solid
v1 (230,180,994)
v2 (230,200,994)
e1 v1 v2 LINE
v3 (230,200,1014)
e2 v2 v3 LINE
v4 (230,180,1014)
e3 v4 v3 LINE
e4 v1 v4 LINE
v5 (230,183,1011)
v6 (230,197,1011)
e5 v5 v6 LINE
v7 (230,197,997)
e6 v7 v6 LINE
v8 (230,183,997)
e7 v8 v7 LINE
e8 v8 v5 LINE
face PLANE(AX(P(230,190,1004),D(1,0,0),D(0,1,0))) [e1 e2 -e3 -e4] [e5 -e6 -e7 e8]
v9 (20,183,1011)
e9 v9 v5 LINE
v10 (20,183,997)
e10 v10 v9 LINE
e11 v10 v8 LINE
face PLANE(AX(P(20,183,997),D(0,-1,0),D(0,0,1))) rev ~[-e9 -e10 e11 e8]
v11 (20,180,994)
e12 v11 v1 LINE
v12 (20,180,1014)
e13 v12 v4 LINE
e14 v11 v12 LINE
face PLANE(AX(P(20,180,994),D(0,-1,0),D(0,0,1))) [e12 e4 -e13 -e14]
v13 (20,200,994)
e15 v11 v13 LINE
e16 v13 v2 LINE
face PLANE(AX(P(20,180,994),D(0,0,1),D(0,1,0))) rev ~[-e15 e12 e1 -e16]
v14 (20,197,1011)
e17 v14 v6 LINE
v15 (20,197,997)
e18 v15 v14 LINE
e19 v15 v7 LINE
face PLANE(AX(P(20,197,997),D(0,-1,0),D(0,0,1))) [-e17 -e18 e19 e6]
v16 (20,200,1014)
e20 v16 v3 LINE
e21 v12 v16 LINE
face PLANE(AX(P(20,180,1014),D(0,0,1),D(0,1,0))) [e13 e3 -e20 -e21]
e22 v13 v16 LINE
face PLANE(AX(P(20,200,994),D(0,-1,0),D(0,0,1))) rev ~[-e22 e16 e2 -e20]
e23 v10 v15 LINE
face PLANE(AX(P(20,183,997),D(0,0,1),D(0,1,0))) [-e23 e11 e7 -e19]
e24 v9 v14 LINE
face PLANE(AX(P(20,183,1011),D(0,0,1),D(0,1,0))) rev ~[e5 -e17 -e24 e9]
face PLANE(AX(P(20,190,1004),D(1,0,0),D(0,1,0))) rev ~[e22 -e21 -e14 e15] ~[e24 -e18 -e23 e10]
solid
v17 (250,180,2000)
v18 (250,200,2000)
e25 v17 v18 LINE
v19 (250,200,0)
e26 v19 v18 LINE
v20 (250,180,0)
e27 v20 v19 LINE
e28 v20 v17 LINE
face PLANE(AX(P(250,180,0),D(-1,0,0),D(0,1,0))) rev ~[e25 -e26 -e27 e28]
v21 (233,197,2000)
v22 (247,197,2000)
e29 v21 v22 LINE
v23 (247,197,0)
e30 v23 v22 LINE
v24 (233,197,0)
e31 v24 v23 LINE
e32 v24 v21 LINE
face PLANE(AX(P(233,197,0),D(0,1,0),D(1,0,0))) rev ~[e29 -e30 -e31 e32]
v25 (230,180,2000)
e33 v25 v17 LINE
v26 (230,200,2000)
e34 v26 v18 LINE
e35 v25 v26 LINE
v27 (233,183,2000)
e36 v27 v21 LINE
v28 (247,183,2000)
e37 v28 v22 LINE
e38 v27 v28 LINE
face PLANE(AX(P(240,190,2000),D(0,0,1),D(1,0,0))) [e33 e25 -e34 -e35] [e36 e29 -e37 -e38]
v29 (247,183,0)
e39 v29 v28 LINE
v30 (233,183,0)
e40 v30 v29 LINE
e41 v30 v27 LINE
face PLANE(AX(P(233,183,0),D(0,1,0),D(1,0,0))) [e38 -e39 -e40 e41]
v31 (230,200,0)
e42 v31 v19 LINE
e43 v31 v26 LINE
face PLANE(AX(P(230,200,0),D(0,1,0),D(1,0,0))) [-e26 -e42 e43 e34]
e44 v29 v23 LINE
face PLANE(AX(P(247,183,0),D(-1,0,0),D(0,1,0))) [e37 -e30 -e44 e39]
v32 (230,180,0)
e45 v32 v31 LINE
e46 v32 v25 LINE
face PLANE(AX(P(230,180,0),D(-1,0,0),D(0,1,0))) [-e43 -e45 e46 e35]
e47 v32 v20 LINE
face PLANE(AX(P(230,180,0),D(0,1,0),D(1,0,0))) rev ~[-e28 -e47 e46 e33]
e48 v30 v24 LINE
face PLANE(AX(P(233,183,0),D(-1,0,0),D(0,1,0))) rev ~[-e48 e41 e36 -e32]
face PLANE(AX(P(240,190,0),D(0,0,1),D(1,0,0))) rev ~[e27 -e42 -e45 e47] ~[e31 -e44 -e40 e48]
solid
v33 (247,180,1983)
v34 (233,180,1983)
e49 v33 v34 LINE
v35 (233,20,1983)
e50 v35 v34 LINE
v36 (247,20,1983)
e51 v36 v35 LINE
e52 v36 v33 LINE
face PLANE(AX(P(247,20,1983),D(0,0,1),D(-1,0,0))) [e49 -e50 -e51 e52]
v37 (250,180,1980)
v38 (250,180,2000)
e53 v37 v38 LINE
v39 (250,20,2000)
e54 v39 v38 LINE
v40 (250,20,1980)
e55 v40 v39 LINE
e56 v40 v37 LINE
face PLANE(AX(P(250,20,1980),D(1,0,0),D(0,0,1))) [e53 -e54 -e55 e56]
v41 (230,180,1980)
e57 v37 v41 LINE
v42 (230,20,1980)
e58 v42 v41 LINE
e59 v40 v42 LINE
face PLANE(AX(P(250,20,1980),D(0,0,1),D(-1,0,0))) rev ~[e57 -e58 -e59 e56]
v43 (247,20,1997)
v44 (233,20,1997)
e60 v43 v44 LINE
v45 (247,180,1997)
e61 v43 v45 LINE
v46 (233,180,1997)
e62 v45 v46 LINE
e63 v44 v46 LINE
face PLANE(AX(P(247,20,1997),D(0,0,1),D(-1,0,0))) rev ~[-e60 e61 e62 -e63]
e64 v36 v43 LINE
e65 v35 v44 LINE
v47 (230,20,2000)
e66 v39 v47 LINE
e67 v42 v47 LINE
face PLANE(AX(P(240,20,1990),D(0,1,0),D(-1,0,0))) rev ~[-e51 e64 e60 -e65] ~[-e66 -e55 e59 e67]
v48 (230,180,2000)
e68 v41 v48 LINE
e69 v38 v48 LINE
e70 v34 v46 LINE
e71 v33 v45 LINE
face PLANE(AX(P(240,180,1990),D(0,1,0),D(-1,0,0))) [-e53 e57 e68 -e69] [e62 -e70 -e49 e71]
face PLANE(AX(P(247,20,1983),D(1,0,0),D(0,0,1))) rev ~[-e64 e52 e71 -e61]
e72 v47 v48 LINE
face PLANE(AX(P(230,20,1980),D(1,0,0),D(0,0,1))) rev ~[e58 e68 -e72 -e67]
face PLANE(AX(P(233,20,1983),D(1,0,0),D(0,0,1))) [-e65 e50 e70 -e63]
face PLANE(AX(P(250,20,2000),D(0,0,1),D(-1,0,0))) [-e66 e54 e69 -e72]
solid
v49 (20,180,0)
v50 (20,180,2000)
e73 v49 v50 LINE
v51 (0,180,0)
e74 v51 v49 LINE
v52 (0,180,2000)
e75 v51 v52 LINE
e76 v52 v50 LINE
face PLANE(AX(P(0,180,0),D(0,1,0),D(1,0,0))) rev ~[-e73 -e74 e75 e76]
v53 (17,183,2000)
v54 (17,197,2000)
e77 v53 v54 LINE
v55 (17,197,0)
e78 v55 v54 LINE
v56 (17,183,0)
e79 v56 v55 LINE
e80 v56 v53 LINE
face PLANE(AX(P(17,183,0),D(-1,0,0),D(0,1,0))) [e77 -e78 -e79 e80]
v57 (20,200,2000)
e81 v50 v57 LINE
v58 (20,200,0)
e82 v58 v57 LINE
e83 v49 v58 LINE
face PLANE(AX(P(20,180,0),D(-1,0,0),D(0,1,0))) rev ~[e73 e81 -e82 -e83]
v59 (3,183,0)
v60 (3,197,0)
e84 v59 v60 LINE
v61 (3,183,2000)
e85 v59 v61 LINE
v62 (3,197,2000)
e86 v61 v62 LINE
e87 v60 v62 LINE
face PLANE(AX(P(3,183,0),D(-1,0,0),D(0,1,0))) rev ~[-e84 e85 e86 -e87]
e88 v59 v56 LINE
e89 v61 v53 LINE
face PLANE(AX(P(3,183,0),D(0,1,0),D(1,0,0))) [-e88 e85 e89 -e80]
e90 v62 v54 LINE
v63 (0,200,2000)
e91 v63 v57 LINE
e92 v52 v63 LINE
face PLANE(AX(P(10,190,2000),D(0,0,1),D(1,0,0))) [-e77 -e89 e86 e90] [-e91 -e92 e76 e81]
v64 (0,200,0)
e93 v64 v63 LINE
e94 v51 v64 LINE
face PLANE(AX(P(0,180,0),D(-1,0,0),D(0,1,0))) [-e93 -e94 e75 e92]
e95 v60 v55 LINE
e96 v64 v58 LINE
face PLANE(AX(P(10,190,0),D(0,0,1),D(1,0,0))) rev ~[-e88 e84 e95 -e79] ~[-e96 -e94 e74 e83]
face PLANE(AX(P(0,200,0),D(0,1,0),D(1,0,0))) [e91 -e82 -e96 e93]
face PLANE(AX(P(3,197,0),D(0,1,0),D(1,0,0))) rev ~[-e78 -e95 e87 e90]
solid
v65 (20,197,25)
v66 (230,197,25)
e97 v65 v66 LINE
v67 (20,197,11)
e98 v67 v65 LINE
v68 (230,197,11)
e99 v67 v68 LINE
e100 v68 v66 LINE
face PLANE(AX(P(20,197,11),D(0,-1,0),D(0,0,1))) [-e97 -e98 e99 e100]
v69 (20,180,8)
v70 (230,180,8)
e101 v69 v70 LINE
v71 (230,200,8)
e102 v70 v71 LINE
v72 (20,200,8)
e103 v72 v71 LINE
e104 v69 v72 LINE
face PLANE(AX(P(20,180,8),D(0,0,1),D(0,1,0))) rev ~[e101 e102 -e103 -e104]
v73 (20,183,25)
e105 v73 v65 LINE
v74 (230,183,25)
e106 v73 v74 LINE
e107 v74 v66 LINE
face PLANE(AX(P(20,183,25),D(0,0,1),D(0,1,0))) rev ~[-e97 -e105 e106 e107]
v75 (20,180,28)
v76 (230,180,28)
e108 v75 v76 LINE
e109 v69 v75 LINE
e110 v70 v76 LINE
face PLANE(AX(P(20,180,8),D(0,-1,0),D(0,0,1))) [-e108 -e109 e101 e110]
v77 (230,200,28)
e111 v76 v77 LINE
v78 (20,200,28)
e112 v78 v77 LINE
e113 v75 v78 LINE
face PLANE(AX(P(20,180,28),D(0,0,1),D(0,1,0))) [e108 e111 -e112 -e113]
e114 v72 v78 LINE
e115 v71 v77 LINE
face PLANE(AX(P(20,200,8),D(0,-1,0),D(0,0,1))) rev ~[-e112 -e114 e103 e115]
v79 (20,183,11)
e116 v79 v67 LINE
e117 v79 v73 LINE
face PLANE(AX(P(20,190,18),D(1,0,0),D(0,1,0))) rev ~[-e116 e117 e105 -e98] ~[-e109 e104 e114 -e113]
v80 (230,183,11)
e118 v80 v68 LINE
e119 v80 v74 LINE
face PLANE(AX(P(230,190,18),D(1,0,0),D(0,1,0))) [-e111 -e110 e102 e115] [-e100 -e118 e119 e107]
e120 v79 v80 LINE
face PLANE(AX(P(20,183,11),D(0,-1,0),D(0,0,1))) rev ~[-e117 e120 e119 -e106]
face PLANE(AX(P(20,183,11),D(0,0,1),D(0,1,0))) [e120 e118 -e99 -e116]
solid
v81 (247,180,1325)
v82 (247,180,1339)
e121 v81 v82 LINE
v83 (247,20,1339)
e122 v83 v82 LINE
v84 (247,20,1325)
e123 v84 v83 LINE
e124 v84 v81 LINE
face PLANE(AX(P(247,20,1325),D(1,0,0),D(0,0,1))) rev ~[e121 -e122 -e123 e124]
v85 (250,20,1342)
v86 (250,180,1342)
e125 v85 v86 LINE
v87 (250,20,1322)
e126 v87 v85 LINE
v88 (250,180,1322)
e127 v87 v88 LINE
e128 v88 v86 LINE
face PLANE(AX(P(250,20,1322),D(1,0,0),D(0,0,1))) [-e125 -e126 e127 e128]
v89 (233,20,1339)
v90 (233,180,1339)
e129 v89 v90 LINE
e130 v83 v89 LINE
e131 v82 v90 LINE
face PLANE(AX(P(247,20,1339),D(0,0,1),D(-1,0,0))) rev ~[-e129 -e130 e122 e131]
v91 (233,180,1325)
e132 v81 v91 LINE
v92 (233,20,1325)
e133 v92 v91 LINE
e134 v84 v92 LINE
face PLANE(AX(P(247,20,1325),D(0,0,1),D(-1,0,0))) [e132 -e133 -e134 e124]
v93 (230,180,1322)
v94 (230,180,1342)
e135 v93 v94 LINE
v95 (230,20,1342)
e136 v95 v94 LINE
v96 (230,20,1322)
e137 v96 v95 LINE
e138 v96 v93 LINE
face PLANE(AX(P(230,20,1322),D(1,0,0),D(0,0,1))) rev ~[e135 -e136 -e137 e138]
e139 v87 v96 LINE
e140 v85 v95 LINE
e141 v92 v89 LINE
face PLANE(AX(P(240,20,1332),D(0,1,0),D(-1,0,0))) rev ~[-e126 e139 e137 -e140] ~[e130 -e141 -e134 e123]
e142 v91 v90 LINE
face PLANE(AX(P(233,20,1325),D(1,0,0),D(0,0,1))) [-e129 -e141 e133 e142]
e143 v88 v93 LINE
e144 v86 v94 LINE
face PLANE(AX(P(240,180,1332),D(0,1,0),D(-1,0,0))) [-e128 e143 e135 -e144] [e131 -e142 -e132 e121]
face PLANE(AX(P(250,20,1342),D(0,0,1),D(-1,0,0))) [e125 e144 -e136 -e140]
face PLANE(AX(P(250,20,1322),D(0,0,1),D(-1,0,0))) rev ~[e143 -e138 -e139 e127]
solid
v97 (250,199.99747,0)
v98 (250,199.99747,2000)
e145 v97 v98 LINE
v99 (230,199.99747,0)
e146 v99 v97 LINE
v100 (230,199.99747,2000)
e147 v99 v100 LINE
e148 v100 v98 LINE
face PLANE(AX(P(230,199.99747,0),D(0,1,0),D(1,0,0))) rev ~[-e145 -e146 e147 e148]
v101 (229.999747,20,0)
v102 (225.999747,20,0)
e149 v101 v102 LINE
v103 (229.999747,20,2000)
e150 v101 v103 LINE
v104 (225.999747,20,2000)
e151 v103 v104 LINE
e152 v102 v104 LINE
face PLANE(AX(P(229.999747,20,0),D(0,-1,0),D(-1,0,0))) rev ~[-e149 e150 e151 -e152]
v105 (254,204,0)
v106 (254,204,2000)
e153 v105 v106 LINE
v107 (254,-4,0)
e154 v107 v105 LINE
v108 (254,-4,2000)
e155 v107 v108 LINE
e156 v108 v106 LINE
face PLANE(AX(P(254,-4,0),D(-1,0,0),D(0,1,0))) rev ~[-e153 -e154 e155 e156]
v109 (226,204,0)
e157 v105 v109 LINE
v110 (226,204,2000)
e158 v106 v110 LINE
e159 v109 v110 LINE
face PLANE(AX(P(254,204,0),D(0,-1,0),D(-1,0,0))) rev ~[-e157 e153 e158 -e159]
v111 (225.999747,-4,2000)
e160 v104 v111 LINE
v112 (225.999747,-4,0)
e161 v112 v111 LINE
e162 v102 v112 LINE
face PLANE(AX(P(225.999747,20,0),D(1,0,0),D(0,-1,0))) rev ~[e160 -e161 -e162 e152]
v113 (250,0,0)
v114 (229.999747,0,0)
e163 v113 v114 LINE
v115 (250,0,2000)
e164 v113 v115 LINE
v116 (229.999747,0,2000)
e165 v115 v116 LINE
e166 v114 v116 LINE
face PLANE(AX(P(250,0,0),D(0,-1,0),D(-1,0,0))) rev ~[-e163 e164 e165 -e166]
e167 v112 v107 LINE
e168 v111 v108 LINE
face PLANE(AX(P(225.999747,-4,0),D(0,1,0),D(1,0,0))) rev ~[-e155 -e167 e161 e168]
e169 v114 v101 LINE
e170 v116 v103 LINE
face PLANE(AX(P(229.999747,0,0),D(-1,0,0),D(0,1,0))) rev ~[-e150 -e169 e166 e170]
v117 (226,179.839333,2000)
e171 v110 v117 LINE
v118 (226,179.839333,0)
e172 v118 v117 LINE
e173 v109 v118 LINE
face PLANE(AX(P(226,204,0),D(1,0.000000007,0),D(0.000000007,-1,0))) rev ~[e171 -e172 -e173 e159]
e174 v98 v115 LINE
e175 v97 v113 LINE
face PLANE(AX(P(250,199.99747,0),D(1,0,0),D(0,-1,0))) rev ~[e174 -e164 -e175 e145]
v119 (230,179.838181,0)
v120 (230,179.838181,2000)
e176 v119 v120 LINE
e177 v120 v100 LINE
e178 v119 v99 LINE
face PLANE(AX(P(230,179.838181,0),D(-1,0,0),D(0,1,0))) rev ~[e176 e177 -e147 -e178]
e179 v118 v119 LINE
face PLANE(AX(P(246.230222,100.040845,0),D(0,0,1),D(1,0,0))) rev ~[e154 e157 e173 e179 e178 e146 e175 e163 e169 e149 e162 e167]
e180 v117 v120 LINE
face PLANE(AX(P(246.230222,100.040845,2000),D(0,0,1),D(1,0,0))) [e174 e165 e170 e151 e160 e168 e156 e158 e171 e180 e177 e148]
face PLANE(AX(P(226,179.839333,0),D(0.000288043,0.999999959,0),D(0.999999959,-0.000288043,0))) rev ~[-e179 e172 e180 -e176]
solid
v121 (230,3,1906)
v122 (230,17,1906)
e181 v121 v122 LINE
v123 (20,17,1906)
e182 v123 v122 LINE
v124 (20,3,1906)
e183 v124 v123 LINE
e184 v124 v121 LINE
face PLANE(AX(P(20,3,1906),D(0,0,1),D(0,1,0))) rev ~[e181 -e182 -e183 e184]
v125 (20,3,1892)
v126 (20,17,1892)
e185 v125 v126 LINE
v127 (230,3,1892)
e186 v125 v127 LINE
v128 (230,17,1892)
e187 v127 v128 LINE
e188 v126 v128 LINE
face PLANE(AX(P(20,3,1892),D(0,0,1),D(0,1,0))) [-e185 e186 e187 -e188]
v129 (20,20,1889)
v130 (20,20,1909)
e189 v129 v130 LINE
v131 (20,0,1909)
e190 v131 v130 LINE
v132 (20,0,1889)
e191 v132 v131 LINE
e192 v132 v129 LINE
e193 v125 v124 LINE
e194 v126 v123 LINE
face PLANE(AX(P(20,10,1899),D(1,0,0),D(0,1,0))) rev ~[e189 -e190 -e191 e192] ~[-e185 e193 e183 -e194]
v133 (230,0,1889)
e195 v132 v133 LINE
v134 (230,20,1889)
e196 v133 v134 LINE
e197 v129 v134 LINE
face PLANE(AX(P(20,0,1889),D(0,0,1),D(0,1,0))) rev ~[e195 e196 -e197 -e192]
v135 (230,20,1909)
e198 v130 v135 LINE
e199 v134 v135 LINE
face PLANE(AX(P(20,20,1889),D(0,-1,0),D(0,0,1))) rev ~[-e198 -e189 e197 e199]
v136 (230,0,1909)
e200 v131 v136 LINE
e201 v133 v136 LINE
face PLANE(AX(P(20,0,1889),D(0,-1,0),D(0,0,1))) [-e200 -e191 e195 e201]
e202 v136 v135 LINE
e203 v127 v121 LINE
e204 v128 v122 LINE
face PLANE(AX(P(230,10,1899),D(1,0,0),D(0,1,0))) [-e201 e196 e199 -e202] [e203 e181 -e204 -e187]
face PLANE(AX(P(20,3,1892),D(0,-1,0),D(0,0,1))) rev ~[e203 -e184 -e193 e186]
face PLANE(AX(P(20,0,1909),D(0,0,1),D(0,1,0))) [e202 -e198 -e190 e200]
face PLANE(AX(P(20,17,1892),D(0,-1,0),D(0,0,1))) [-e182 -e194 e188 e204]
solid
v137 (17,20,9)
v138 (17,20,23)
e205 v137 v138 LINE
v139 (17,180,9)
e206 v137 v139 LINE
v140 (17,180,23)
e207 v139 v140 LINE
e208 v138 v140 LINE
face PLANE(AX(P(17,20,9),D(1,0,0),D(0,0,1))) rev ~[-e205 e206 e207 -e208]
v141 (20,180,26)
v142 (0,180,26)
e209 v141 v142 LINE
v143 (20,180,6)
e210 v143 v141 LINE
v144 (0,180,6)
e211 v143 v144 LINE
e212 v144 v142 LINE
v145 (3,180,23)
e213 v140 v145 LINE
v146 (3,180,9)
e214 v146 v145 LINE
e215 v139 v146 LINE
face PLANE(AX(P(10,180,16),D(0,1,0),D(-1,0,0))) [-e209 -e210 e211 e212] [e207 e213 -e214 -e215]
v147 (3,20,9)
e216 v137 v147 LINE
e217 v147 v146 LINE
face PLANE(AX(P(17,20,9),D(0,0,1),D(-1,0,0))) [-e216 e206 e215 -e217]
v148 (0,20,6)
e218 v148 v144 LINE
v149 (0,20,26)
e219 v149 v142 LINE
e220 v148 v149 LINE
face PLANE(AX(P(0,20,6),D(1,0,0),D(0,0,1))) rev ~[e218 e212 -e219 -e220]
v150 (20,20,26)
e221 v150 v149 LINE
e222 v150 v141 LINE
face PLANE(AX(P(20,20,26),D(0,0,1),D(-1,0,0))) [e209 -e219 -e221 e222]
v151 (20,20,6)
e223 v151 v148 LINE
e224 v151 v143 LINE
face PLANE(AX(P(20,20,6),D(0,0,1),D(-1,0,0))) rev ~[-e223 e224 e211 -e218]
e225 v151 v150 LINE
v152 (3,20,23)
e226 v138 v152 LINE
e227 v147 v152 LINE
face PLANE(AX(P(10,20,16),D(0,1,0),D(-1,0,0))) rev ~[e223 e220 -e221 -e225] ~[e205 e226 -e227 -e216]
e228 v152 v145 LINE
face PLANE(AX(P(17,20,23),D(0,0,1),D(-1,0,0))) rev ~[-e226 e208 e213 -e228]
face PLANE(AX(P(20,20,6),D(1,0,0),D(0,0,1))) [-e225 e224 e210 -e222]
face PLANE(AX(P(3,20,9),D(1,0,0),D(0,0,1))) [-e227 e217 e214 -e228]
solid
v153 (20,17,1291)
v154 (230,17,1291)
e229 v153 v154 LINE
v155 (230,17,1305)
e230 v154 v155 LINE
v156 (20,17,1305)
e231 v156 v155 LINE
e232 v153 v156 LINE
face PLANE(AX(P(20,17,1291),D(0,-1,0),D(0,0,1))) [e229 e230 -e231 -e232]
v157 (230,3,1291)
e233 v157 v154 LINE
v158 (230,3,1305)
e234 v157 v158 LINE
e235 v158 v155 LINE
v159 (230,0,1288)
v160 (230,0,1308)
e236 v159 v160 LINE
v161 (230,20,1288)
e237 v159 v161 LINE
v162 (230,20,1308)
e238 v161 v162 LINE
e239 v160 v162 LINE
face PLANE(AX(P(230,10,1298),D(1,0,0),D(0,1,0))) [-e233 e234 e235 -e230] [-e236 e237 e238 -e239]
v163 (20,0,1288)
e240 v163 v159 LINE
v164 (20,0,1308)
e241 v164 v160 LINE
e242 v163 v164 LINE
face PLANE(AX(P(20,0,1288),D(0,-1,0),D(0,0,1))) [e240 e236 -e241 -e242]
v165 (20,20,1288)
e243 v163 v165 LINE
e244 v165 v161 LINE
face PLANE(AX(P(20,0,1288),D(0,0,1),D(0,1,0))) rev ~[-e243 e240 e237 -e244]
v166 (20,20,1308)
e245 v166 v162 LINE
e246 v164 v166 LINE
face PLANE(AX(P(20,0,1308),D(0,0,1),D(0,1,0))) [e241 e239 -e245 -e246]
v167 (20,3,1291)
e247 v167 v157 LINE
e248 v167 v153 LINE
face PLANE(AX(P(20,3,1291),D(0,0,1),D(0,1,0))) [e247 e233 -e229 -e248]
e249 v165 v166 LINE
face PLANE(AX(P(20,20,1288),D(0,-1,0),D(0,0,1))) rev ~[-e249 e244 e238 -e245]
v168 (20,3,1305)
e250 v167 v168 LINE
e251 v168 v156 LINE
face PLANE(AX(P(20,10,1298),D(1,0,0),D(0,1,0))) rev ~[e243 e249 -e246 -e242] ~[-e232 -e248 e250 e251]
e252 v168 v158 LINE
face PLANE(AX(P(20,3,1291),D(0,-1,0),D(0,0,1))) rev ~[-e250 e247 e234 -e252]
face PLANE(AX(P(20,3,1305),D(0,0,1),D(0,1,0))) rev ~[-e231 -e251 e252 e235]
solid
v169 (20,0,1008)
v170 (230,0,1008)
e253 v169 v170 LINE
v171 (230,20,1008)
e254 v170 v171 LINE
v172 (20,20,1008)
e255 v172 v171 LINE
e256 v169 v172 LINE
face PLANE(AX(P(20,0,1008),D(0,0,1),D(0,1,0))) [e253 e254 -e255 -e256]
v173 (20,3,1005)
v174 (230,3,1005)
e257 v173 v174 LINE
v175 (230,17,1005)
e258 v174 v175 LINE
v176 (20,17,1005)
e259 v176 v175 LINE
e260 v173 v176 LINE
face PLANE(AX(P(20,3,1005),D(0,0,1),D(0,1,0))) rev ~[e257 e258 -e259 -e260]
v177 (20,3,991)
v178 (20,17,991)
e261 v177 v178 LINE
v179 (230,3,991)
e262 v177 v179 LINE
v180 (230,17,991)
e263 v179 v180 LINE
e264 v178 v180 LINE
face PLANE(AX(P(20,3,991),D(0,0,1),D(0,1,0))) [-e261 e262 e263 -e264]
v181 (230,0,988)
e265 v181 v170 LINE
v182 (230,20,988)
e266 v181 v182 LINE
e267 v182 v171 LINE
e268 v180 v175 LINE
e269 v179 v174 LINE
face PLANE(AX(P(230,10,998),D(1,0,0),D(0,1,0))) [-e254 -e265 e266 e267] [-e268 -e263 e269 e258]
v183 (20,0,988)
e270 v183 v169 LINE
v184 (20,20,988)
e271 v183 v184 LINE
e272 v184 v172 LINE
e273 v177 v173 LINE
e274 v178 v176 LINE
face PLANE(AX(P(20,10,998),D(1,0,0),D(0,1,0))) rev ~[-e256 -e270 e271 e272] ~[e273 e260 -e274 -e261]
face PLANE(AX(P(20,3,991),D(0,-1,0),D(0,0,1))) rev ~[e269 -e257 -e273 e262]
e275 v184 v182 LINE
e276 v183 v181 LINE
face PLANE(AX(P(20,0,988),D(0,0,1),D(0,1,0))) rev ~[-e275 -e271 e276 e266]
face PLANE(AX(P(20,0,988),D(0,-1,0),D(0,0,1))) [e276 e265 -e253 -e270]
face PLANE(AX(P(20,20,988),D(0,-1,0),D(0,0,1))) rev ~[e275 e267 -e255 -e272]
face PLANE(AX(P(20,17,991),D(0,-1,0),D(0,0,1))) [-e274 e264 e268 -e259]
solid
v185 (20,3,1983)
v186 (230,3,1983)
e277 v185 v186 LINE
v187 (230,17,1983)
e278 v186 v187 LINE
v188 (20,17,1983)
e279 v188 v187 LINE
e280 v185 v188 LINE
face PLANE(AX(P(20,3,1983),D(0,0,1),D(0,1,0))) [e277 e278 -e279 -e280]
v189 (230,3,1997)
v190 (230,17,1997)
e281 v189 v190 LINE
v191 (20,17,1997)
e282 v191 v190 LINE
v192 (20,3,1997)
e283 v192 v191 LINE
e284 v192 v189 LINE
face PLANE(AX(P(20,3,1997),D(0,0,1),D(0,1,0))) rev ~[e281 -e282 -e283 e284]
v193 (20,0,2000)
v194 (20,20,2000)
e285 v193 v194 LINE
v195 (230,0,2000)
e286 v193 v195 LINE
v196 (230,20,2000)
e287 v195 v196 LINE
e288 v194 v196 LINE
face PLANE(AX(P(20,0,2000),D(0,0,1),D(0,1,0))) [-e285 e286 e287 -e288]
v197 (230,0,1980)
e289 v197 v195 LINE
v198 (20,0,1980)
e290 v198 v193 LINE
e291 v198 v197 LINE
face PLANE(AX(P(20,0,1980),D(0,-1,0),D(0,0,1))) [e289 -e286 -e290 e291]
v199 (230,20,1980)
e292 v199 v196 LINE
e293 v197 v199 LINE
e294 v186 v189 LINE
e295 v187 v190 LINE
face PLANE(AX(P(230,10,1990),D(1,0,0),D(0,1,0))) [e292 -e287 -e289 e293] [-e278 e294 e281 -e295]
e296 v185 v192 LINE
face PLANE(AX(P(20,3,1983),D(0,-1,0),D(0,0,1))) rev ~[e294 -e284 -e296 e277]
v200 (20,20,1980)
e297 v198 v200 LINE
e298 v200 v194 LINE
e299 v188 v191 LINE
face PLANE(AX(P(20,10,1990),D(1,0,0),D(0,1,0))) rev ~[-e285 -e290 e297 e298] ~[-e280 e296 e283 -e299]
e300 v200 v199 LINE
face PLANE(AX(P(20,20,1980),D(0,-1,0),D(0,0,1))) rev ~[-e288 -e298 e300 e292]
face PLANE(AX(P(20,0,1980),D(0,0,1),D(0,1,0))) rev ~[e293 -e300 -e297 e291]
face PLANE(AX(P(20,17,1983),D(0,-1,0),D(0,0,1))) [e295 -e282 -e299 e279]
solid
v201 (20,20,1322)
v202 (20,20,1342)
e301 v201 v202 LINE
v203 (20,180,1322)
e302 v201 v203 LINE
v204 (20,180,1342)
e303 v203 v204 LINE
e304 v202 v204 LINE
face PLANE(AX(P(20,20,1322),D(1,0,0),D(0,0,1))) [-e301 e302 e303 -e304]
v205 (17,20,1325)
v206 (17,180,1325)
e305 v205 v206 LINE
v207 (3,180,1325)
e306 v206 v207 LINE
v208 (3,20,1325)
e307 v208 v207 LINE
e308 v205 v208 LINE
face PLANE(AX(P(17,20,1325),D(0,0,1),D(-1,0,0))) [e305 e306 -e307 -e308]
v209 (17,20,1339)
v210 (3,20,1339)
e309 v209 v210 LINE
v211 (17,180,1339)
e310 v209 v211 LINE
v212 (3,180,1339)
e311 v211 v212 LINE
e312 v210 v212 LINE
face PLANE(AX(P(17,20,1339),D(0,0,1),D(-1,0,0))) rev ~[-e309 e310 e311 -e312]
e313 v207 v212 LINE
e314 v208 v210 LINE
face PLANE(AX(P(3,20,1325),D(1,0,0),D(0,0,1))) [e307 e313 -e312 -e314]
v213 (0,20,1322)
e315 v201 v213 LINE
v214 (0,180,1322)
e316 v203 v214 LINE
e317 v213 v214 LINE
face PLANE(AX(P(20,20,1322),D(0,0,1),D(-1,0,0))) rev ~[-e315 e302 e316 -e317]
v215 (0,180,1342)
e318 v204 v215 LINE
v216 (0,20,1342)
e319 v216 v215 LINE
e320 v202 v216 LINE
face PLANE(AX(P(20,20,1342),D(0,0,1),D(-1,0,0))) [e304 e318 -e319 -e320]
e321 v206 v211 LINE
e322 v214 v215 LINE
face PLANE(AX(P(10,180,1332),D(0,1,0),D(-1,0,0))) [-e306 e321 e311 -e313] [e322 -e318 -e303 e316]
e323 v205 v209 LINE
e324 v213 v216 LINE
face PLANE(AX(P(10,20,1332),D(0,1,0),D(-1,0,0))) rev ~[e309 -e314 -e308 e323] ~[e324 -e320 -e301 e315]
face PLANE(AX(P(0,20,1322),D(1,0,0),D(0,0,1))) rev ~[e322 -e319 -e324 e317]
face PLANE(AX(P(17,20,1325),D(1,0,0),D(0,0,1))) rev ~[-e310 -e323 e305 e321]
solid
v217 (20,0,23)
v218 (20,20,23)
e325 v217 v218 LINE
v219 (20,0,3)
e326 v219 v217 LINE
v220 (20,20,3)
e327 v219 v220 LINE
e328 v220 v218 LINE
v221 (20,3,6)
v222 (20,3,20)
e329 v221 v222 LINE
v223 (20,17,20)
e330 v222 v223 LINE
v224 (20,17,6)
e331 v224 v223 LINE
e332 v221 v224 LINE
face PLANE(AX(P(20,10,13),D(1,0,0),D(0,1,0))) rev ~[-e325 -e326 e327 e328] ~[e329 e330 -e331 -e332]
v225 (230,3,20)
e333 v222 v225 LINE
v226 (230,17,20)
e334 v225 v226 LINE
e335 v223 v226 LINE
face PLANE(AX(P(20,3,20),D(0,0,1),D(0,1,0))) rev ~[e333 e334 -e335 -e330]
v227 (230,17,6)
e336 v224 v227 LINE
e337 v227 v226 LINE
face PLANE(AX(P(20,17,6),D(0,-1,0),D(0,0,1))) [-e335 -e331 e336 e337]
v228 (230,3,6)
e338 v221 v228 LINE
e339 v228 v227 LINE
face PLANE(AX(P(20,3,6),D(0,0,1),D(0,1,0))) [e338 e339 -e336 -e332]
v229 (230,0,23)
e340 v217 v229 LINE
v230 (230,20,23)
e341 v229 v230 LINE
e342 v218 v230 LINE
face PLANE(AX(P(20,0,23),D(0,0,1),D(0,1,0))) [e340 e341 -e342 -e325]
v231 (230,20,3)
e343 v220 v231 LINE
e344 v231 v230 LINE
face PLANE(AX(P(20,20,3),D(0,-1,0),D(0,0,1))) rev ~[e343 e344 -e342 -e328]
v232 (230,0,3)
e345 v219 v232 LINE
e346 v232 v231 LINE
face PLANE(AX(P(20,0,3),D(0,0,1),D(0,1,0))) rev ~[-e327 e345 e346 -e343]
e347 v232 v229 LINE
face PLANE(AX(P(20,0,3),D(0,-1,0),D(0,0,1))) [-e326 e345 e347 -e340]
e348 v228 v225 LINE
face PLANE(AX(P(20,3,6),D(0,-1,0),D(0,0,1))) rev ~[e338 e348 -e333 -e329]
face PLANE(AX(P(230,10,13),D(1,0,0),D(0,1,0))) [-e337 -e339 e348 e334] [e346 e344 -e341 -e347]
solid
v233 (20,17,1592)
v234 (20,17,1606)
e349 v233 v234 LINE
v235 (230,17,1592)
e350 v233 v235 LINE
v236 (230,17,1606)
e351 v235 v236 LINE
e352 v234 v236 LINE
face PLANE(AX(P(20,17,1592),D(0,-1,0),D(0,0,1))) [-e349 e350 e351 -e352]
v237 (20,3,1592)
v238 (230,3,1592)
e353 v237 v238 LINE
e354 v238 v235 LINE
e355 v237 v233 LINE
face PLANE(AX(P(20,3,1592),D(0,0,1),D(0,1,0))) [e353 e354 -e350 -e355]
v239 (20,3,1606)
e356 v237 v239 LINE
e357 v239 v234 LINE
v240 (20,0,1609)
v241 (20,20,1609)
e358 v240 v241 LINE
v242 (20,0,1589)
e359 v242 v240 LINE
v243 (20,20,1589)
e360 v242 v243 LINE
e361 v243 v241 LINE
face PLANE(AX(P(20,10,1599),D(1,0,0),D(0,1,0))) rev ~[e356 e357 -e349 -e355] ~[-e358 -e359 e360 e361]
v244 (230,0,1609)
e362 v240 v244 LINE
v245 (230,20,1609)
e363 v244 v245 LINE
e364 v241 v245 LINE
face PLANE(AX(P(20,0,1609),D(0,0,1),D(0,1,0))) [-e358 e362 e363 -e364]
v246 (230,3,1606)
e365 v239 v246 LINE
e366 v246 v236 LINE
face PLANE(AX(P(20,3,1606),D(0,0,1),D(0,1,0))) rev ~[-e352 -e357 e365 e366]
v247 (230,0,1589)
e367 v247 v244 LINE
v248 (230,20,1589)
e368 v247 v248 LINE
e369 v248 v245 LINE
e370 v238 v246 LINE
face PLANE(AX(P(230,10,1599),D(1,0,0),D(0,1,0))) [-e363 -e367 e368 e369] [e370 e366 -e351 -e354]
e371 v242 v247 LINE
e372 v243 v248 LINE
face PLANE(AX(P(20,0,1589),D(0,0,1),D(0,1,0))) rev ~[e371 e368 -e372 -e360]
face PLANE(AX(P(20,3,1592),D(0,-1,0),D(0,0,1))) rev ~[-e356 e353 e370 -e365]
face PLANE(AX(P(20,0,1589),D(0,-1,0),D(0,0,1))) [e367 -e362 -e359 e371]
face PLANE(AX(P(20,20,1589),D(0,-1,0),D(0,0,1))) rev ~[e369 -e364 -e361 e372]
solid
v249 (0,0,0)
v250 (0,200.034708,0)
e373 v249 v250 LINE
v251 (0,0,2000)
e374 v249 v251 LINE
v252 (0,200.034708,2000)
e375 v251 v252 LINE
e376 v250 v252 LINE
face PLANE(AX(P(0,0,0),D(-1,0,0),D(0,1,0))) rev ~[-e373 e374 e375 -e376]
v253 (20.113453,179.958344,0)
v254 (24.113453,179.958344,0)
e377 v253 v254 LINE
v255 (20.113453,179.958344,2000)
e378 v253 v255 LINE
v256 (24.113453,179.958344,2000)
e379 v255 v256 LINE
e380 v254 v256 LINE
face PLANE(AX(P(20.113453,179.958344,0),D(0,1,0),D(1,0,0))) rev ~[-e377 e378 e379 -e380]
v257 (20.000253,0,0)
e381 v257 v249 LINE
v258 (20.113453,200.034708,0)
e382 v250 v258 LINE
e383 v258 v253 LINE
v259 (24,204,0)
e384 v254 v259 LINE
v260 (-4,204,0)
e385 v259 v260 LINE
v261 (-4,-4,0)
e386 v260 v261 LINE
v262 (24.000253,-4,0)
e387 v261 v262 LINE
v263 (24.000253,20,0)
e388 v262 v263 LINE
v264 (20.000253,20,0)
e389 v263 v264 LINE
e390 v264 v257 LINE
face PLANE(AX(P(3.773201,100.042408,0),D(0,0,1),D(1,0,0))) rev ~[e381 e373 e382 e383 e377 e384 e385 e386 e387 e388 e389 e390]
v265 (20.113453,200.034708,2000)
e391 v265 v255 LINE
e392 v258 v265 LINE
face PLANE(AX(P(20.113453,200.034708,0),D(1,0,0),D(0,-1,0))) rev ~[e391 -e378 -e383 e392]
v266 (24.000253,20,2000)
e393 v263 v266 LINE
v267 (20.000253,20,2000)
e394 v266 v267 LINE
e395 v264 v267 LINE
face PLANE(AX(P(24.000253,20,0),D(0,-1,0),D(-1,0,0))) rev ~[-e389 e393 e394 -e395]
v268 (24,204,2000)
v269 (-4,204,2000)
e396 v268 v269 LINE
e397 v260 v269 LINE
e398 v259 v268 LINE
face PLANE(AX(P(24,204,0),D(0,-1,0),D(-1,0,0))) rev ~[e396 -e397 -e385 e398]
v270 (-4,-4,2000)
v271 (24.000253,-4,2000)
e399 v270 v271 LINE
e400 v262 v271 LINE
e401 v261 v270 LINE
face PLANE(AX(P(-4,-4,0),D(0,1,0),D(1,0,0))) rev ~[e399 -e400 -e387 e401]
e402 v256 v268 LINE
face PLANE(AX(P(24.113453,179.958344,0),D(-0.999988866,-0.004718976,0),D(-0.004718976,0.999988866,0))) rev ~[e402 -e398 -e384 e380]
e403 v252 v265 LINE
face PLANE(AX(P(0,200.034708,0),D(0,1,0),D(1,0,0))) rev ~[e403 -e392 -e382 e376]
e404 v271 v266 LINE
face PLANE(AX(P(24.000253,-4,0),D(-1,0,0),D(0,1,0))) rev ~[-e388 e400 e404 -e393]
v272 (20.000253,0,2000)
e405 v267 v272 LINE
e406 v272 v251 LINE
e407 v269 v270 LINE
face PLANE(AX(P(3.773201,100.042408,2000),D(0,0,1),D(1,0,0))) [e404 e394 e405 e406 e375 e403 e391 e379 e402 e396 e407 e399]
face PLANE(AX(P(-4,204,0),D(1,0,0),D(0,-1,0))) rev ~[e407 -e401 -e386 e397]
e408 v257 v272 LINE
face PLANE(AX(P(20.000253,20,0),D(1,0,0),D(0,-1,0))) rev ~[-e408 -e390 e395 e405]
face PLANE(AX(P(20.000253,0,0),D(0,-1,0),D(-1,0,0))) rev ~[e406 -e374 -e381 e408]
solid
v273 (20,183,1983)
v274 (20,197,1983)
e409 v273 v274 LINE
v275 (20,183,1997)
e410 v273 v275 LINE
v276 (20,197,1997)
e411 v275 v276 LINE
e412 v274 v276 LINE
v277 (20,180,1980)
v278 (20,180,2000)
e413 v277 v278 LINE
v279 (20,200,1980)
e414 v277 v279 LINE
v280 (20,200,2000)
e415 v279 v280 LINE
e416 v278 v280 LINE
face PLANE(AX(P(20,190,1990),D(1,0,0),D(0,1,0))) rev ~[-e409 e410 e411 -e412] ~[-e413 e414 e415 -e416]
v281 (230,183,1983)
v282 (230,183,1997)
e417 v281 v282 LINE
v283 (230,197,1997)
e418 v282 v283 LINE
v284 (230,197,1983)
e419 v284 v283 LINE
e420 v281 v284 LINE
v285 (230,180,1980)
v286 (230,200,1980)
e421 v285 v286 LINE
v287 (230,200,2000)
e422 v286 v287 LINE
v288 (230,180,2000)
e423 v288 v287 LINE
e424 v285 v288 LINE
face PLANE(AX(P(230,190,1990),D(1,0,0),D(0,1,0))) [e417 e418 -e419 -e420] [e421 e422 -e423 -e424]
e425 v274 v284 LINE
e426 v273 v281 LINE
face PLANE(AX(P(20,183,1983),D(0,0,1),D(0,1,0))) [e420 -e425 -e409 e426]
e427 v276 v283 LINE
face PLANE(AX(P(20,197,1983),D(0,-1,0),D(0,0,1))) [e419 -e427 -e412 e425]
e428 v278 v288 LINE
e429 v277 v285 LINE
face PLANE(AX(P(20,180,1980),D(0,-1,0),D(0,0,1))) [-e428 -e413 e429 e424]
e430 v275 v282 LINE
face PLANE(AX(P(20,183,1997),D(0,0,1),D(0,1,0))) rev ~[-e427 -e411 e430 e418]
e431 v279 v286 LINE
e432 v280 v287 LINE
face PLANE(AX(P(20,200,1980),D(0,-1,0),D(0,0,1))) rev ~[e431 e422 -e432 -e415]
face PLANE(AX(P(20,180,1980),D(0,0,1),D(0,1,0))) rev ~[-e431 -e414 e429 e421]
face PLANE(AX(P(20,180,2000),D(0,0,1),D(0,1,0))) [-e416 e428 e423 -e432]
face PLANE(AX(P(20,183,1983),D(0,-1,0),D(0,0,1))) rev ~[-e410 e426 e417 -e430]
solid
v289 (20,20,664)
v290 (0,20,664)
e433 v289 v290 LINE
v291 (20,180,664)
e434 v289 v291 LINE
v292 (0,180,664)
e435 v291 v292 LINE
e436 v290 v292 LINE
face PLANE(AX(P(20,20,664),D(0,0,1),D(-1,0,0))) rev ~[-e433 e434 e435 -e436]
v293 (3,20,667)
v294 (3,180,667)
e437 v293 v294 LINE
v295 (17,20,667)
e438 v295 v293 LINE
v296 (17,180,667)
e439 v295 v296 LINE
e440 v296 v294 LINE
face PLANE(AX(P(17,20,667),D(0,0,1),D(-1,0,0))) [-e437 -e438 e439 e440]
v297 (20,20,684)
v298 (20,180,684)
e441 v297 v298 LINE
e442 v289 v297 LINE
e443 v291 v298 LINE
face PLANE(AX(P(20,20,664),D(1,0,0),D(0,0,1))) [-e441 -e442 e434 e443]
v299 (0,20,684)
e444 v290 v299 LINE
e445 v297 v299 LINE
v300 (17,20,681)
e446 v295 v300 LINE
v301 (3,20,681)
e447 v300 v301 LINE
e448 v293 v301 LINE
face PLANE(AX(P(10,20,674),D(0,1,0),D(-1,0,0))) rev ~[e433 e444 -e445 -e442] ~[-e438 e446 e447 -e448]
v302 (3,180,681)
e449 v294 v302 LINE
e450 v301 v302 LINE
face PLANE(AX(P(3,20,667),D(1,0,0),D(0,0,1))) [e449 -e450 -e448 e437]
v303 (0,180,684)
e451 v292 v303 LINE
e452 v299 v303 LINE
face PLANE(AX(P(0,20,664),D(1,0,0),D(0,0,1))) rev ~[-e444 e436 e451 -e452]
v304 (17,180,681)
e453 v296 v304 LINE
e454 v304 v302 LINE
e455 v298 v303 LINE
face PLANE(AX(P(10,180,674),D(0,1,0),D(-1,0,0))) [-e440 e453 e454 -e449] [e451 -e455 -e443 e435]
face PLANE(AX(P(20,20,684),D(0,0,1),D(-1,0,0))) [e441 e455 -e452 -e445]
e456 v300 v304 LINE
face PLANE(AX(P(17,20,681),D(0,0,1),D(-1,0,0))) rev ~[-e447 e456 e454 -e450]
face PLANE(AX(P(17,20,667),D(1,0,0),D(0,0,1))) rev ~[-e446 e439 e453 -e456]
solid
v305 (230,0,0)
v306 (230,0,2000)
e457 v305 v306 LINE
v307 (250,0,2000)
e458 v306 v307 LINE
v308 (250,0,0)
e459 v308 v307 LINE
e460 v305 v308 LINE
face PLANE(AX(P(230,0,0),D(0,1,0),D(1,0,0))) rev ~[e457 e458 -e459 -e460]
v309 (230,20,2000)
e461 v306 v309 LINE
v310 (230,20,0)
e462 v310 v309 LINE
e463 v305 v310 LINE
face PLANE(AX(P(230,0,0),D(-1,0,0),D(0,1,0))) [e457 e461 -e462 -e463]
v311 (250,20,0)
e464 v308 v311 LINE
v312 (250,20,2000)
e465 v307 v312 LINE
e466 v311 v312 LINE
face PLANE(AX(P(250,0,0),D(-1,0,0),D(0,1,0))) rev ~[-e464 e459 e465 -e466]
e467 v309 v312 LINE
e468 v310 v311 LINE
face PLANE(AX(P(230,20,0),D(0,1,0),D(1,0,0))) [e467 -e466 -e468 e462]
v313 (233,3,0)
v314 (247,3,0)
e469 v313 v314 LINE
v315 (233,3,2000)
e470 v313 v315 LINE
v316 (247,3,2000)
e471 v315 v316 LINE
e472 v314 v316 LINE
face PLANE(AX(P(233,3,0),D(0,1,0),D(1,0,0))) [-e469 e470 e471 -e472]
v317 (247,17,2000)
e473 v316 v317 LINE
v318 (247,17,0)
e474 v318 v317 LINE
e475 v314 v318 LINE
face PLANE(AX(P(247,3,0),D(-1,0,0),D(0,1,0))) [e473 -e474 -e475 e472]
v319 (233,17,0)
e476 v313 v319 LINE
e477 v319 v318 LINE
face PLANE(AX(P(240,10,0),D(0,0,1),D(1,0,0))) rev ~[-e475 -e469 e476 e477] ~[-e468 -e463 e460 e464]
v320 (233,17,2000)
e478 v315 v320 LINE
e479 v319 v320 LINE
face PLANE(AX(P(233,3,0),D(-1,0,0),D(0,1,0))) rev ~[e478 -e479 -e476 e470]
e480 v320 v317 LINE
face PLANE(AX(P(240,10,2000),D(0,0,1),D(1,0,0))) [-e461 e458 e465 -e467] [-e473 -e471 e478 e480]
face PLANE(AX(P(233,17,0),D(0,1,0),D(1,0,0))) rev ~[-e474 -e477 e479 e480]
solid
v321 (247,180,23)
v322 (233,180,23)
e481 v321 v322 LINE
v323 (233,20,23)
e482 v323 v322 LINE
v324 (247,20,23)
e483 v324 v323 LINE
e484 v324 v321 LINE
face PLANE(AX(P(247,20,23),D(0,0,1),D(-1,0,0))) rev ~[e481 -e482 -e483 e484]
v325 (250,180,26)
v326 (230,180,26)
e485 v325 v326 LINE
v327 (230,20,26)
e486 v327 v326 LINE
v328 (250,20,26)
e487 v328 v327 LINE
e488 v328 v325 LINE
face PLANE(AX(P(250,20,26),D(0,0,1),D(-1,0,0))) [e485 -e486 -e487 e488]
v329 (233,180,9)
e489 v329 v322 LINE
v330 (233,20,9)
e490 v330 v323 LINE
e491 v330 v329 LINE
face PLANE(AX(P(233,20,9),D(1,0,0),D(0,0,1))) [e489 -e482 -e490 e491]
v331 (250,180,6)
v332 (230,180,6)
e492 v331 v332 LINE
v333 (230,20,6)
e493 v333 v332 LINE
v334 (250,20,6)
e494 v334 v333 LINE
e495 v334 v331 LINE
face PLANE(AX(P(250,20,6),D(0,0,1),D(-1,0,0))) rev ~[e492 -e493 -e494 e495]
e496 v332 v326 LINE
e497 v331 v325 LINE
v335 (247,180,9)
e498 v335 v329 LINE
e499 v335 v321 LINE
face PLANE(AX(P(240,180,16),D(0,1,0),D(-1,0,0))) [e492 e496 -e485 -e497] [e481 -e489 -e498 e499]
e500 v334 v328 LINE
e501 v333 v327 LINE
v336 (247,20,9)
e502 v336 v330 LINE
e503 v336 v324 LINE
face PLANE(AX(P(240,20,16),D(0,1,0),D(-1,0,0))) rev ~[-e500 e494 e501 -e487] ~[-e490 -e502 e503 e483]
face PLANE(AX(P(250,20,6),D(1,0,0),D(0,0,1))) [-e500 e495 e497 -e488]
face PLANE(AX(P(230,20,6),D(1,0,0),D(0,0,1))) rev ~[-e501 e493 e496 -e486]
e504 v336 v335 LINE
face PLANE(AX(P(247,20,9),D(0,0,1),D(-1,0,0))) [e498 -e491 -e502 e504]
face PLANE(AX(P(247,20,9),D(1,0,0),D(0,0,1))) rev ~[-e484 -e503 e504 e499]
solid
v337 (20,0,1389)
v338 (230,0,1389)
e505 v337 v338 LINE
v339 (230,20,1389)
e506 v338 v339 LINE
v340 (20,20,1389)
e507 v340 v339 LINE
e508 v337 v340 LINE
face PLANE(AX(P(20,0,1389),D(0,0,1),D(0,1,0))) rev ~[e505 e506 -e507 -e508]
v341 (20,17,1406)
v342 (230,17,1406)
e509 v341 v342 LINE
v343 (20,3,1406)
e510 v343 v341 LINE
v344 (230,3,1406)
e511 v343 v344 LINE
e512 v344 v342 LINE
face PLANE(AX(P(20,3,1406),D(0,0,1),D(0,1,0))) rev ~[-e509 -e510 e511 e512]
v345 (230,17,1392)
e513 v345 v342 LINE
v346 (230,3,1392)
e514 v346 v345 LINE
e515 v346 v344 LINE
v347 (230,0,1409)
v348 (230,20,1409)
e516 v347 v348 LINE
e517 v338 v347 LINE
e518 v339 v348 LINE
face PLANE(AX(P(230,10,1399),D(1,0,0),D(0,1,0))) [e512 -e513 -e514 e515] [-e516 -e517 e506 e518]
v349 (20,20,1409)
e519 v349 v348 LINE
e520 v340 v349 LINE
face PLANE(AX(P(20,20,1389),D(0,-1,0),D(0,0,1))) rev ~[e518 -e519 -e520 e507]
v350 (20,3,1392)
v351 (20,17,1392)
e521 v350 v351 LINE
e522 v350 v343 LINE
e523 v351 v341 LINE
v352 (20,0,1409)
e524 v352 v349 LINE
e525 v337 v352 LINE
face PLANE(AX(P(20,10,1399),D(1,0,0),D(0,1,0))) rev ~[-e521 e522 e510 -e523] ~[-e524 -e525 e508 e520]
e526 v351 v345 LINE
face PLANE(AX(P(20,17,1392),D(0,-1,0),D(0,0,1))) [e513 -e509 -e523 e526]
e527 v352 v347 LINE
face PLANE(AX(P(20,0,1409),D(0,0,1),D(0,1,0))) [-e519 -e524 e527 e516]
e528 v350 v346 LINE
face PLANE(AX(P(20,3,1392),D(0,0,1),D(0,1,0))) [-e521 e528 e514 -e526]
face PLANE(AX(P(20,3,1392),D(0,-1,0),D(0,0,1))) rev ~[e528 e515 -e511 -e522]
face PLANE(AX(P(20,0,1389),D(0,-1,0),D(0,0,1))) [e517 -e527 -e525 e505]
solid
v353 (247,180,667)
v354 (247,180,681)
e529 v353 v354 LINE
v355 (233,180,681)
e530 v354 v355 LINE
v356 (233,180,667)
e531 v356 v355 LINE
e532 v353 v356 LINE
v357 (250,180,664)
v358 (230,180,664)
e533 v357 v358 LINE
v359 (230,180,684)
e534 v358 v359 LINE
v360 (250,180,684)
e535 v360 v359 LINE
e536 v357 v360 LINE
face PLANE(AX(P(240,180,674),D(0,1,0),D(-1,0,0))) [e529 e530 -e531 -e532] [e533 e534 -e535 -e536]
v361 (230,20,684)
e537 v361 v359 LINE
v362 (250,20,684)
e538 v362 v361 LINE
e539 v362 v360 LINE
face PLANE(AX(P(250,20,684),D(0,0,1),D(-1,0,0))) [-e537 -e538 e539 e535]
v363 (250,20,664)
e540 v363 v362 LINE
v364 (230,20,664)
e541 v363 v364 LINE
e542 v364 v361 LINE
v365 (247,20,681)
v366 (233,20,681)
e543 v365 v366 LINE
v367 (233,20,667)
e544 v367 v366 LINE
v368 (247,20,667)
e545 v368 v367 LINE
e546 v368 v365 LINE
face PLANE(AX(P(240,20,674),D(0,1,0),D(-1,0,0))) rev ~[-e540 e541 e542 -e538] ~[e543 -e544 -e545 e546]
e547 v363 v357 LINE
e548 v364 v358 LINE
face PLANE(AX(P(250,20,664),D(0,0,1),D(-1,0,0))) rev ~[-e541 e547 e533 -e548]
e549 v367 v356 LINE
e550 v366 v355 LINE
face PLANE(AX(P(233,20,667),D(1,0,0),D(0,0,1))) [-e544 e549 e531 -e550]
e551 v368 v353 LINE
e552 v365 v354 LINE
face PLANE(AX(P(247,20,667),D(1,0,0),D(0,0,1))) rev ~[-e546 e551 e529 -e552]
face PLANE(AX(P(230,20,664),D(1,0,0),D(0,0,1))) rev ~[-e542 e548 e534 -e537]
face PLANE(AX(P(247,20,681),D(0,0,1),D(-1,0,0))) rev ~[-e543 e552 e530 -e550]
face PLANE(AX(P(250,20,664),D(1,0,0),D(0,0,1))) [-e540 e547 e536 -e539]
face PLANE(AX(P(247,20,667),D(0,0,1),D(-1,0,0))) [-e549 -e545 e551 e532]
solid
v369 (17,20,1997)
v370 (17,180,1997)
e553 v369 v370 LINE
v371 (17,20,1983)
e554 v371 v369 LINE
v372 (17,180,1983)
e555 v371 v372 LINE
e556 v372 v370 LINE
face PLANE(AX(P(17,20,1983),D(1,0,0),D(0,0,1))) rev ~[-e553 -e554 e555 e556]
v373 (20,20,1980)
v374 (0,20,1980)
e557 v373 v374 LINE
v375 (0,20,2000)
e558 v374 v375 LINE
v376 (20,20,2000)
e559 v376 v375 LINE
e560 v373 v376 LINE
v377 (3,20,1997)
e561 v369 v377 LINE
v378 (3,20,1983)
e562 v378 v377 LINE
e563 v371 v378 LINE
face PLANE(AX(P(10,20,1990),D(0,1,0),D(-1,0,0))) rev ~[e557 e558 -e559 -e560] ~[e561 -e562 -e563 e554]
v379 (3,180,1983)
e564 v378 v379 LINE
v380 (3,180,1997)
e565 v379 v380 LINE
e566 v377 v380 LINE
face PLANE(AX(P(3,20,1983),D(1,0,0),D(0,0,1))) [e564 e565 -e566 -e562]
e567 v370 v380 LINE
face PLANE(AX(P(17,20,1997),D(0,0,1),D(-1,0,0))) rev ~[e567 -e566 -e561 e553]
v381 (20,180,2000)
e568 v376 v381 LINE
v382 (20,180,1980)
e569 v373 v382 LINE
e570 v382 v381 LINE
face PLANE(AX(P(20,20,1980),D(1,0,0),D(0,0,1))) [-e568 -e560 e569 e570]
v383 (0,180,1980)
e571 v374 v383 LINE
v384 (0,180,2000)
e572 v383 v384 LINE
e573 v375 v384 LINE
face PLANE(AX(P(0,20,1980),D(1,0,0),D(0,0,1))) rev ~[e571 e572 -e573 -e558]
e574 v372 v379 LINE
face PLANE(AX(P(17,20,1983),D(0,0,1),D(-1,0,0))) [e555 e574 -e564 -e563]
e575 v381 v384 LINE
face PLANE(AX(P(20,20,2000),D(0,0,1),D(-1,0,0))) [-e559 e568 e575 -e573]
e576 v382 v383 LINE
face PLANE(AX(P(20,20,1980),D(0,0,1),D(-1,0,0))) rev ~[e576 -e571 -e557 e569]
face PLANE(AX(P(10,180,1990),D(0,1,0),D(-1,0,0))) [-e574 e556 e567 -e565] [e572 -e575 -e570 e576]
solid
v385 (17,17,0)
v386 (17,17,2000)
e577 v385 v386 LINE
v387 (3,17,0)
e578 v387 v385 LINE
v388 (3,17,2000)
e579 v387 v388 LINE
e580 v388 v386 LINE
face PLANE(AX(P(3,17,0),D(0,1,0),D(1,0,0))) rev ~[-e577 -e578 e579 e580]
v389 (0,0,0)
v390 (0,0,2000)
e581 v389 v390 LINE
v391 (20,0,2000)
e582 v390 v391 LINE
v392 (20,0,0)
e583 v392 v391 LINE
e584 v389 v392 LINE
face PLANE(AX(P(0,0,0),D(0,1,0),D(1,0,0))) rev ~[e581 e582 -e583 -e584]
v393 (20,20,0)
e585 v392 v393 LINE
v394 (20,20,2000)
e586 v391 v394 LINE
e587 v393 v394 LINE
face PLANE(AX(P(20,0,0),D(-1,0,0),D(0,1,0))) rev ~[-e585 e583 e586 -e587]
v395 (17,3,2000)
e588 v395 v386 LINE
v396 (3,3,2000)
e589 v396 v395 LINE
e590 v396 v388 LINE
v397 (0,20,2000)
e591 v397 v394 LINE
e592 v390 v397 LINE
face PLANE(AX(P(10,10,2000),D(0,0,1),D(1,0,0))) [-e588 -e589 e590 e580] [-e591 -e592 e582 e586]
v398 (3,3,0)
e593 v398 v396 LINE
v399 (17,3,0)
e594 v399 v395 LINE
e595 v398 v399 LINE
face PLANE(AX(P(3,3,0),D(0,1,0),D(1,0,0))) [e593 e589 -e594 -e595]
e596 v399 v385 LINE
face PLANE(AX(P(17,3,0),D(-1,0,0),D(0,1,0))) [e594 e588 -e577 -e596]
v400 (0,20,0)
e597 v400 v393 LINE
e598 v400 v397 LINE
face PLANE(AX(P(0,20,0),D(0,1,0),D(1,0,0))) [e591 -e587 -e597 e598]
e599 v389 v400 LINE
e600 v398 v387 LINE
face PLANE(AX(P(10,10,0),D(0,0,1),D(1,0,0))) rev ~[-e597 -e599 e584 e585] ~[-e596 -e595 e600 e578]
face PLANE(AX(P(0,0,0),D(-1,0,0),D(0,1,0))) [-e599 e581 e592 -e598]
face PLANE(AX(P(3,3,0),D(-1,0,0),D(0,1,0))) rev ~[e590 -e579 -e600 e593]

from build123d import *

# Parameters (mm, degrees)
F0_W     = 20
F0_H     = 20
F0_W_2   = 14
F0_H_2   = 14
F1_DEPTH = 2000
F3_DEPTH = 2000
F4_W     = 20
F4_H     = 20
F4_W_2   = 14
F4_H_2   = 14
F5_DEPTH = 210
F6_W     = 20
F6_H     = 20
F6_W_2   = 14
F6_H_2   = 14
F7_DEPTH = 160
F8_W     = 20
F8_H     = 20
F8_W_2   = 14
F8_H_2   = 14
F9_DEPTH = 210


# Not quite as in the source:
# - a feature names something its author has since deleted; it is built from what else it names


with BuildPart() as f1:
    # F0 (on Top) → F1 (new body)
    with BuildSketch(Plane.XY):
        with Locations((10, 190)):
            Rectangle(F0_W, F0_H)
        with Locations((10, 190)):
            Rectangle(F0_W_2, F0_H_2, mode=Mode.SUBTRACT)
    extrude(amount=F1_DEPTH)


with BuildPart() as f1b:
    # F0 (on Top) → F1, piece 2 (new body)
    with BuildSketch(Plane.XY):
        with Locations((240, 190)):
            Rectangle(F0_W, F0_H)
        with Locations((240, 190)):
            Rectangle(F0_W_2, F0_H_2, mode=Mode.SUBTRACT)
    extrude(amount=F1_DEPTH)


with BuildPart() as f1c:
    # F0 (on Top) → F1, piece 3 (new body)
    with BuildSketch(Plane.XY):
        with Locations((240, 10)):
            Rectangle(F0_W, F0_H)
        with Locations((240, 10)):
            Rectangle(F0_W_2, F0_H_2, mode=Mode.SUBTRACT)
    extrude(amount=F1_DEPTH)


with BuildPart() as f1d:
    # F0 (on Top) → F1, piece 4 (new body)
    with BuildSketch(Plane.XY):
        with Locations((10, 10)):
            Rectangle(F0_W, F0_H)
        with Locations((10, 10)):
            Rectangle(F0_W_2, F0_H_2, mode=Mode.SUBTRACT)
    extrude(amount=F1_DEPTH)


with BuildPart() as f3:
    # F2 (on Top) → F3 (new body)
    with BuildSketch(Plane.XY):
        Polygon((20.0002528727, 0), (0, 0), (0, 200.0347077847), (20.113453269, 200.0347077847), (20.113453269, 179.9583435059), (24.113453269, 179.9583435059), (24, 204), (-4, 204), (-4, -4), (24.0002528727, -4), (24.0002528727, 20), (20.0002528727, 20), align=None)
    extrude(amount=F3_DEPTH)


with BuildPart() as f3b:
    # F2 (on Top) → F3, piece 2 (new body)
    with BuildSketch(Plane.XY):
        Polygon((229.9997471273, 20), (225.9997471273, 20), (225.9997471273, -4), (254, -4), (254, 204), (226, 204), (226.0000001659, 179.8393327155), (230, 179.838180542), (230, 199.9974697828), (250, 199.9974697828), (250, 0), (229.9997471273, 0), align=None)
    extrude(amount=F3_DEPTH)


with BuildPart() as f5:
    # F4 (on face) → F5 (new body)
    with BuildSketch(Plane.YZ.offset(20)):
        with Locations((10, 1990)):
            Rectangle(F4_W, F4_H)
        with Locations((10, 1990)):
            Rectangle(F4_W_2, F4_H_2, mode=Mode.SUBTRACT)
    extrude(amount=F5_DEPTH)


with BuildPart() as f5b:
    # F4 (on face) → F5, piece 2 (new body)
    with BuildSketch(Plane.YZ.offset(20)):
        with Locations((10, 1899)):
            Rectangle(F4_W, F4_H)
        with Locations((10, 1899)):
            Rectangle(F4_W_2, F4_H_2, mode=Mode.SUBTRACT)
    extrude(amount=F5_DEPTH)


with BuildPart() as f5c:
    # F4 (on face) → F5, piece 3 (new body)
    with BuildSketch(Plane.YZ.offset(20)):
        with Locations((10, 1599)):
            Rectangle(F4_W, F4_H)
        with Locations((10, 1599)):
            Rectangle(F4_W_2, F4_H_2, mode=Mode.SUBTRACT)
    extrude(amount=F5_DEPTH)


with BuildPart() as f5d:
    # F4 (on face) → F5, piece 4 (new body)
    with BuildSketch(Plane.YZ.offset(20)):
        with Locations((10, 1399)):
            Rectangle(F4_W, F4_H)
        with Locations((10, 1399)):
            Rectangle(F4_W_2, F4_H_2, mode=Mode.SUBTRACT)
    extrude(amount=F5_DEPTH)


with BuildPart() as f5e:
    # F4 (on face) → F5, piece 5 (new body)
    with BuildSketch(Plane.YZ.offset(20)):
        with Locations((10, 1298)):
            Rectangle(F4_W, F4_H)
        with Locations((10, 1298)):
            Rectangle(F4_W_2, F4_H_2, mode=Mode.SUBTRACT)
    extrude(amount=F5_DEPTH)


with BuildPart() as f5f:
    # F4 (on face) → F5, piece 6 (new body)
    with BuildSketch(Plane.YZ.offset(20)):
        with Locations((10, 998)):
            Rectangle(F4_W, F4_H)
        with Locations((10, 998)):
            Rectangle(F4_W_2, F4_H_2, mode=Mode.SUBTRACT)
    extrude(amount=F5_DEPTH)


with BuildPart() as f5g:
    # F4 (on face) → F5, piece 7 (new body)
    with BuildSketch(Plane.YZ.offset(20)):
        with Locations((10, 13)):
            Rectangle(F4_W, F4_H)
        with Locations((10, 13)):
            Rectangle(F4_W_2, F4_H_2, mode=Mode.SUBTRACT)
    extrude(amount=F5_DEPTH)


with BuildPart() as f7:
    # F6 (on face) → F7 (new body)
    with BuildSketch(Plane(origin=(0, 20, 0), x_dir=(-1, 0, 0), z_dir=(0, 1, 0))):
        with Locations((-10, 1990)):
            Rectangle(F6_W, F6_H)
        with Locations((-10, 1990)):
            Rectangle(F6_W_2, F6_H_2, mode=Mode.SUBTRACT)
    extrude(amount=F7_DEPTH)


with BuildPart() as f7b:
    # F6 (on face) → F7, piece 2 (new body)
    with BuildSketch(Plane(origin=(0, 20, 0), x_dir=(-1, 0, 0), z_dir=(0, 1, 0))):
        with Locations((-240, 1990)):
            Rectangle(F6_W, F6_H)
        with Locations((-240, 1990)):
            Rectangle(F6_W_2, F6_H_2, mode=Mode.SUBTRACT)
    extrude(amount=F7_DEPTH)


with BuildPart() as f7c:
    # F6 (on face) → F7, piece 3 (new body)
    with BuildSketch(Plane(origin=(0, 20, 0), x_dir=(-1, 0, 0), z_dir=(0, 1, 0))):
        with Locations((-10, 1332)):
            Rectangle(F6_W, F6_H)
        with Locations((-10, 1332)):
            Rectangle(F6_W_2, F6_H_2, mode=Mode.SUBTRACT)
    extrude(amount=F7_DEPTH)


with BuildPart() as f7d:
    # F6 (on face) → F7, piece 4 (new body)
    with BuildSketch(Plane(origin=(0, 20, 0), x_dir=(-1, 0, 0), z_dir=(0, 1, 0))):
        with Locations((-240, 1332)):
            Rectangle(F6_W, F6_H)
        with Locations((-240, 1332)):
            Rectangle(F6_W_2, F6_H_2, mode=Mode.SUBTRACT)
    extrude(amount=F7_DEPTH)


with BuildPart() as f7e:
    # F6 (on face) → F7, piece 5 (new body)
    with BuildSketch(Plane(origin=(0, 20, 0), x_dir=(-1, 0, 0), z_dir=(0, 1, 0))):
        with Locations((-10, 674)):
            Rectangle(F6_W, F6_H)
        with Locations((-10, 674)):
            Rectangle(F6_W_2, F6_H_2, mode=Mode.SUBTRACT)
    extrude(amount=F7_DEPTH)


with BuildPart() as f7f:
    # F6 (on face) → F7, piece 6 (new body)
    with BuildSketch(Plane(origin=(0, 20, 0), x_dir=(-1, 0, 0), z_dir=(0, 1, 0))):
        with Locations((-240, 674)):
            Rectangle(F6_W, F6_H)
        with Locations((-240, 674)):
            Rectangle(F6_W_2, F6_H_2, mode=Mode.SUBTRACT)
    extrude(amount=F7_DEPTH)


with BuildPart() as f7g:
    # F6 (on face) → F7, piece 7 (new body)
    with BuildSketch(Plane(origin=(0, 20, 0), x_dir=(-1, 0, 0), z_dir=(0, 1, 0))):
        with Locations((-10, 16)):
            Rectangle(F6_W, F6_H)
        with Locations((-10, 16)):
            Rectangle(F6_W_2, F6_H_2, mode=Mode.SUBTRACT)
    extrude(amount=F7_DEPTH)


with BuildPart() as f7h:
    # F6 (on face) → F7, piece 8 (new body)
    with BuildSketch(Plane(origin=(0, 20, 0), x_dir=(-1, 0, 0), z_dir=(0, 1, 0))):
        with Locations((-240, 16)):
            Rectangle(F6_W, F6_H)
        with Locations((-240, 16)):
            Rectangle(F6_W_2, F6_H_2, mode=Mode.SUBTRACT)
    extrude(amount=F7_DEPTH)


with BuildPart() as f9:
    # F8 (on face) → F9 (new body)
    with BuildSketch(Plane.YZ.offset(20)):
        with Locations((190, 1990)):
            Rectangle(F8_W, F8_H)
        with Locations((190, 1990)):
            Rectangle(F8_W_2, F8_H_2, mode=Mode.SUBTRACT)
    extrude(amount=F9_DEPTH)


with BuildPart() as f9b:
    # F8 (on face) → F9, piece 2 (new body)
    with BuildSketch(Plane.YZ.offset(20)):
        with Locations((190, 1004)):
            Rectangle(F8_W, F8_H)
        with Locations((190, 1004)):
            Rectangle(F8_W_2, F8_H_2, mode=Mode.SUBTRACT)
    extrude(amount=F9_DEPTH)


with BuildPart() as f9c:
    # F8 (on face) → F9, piece 3 (new body)
    with BuildSketch(Plane.YZ.offset(20)):
        with Locations((190, 18)):
            Rectangle(F8_W, F8_H)
        with Locations((190, 18)):
            Rectangle(F8_W_2, F8_H_2, mode=Mode.SUBTRACT)
    extrude(amount=F9_DEPTH)


solid = Compound([f1.part, f1b.part, f1c.part, f1d.part, f3.part, f3b.part, f5.part, f5b.part, f5c.part, f5d.part, f5e.part, f5f.part, f5g.part, f7.part, f7b.part, f7c.part, f7d.part, f7e.part, f7f.part, f7g.part, f7h.part, f9.part, f9b.part, f9c.part])
